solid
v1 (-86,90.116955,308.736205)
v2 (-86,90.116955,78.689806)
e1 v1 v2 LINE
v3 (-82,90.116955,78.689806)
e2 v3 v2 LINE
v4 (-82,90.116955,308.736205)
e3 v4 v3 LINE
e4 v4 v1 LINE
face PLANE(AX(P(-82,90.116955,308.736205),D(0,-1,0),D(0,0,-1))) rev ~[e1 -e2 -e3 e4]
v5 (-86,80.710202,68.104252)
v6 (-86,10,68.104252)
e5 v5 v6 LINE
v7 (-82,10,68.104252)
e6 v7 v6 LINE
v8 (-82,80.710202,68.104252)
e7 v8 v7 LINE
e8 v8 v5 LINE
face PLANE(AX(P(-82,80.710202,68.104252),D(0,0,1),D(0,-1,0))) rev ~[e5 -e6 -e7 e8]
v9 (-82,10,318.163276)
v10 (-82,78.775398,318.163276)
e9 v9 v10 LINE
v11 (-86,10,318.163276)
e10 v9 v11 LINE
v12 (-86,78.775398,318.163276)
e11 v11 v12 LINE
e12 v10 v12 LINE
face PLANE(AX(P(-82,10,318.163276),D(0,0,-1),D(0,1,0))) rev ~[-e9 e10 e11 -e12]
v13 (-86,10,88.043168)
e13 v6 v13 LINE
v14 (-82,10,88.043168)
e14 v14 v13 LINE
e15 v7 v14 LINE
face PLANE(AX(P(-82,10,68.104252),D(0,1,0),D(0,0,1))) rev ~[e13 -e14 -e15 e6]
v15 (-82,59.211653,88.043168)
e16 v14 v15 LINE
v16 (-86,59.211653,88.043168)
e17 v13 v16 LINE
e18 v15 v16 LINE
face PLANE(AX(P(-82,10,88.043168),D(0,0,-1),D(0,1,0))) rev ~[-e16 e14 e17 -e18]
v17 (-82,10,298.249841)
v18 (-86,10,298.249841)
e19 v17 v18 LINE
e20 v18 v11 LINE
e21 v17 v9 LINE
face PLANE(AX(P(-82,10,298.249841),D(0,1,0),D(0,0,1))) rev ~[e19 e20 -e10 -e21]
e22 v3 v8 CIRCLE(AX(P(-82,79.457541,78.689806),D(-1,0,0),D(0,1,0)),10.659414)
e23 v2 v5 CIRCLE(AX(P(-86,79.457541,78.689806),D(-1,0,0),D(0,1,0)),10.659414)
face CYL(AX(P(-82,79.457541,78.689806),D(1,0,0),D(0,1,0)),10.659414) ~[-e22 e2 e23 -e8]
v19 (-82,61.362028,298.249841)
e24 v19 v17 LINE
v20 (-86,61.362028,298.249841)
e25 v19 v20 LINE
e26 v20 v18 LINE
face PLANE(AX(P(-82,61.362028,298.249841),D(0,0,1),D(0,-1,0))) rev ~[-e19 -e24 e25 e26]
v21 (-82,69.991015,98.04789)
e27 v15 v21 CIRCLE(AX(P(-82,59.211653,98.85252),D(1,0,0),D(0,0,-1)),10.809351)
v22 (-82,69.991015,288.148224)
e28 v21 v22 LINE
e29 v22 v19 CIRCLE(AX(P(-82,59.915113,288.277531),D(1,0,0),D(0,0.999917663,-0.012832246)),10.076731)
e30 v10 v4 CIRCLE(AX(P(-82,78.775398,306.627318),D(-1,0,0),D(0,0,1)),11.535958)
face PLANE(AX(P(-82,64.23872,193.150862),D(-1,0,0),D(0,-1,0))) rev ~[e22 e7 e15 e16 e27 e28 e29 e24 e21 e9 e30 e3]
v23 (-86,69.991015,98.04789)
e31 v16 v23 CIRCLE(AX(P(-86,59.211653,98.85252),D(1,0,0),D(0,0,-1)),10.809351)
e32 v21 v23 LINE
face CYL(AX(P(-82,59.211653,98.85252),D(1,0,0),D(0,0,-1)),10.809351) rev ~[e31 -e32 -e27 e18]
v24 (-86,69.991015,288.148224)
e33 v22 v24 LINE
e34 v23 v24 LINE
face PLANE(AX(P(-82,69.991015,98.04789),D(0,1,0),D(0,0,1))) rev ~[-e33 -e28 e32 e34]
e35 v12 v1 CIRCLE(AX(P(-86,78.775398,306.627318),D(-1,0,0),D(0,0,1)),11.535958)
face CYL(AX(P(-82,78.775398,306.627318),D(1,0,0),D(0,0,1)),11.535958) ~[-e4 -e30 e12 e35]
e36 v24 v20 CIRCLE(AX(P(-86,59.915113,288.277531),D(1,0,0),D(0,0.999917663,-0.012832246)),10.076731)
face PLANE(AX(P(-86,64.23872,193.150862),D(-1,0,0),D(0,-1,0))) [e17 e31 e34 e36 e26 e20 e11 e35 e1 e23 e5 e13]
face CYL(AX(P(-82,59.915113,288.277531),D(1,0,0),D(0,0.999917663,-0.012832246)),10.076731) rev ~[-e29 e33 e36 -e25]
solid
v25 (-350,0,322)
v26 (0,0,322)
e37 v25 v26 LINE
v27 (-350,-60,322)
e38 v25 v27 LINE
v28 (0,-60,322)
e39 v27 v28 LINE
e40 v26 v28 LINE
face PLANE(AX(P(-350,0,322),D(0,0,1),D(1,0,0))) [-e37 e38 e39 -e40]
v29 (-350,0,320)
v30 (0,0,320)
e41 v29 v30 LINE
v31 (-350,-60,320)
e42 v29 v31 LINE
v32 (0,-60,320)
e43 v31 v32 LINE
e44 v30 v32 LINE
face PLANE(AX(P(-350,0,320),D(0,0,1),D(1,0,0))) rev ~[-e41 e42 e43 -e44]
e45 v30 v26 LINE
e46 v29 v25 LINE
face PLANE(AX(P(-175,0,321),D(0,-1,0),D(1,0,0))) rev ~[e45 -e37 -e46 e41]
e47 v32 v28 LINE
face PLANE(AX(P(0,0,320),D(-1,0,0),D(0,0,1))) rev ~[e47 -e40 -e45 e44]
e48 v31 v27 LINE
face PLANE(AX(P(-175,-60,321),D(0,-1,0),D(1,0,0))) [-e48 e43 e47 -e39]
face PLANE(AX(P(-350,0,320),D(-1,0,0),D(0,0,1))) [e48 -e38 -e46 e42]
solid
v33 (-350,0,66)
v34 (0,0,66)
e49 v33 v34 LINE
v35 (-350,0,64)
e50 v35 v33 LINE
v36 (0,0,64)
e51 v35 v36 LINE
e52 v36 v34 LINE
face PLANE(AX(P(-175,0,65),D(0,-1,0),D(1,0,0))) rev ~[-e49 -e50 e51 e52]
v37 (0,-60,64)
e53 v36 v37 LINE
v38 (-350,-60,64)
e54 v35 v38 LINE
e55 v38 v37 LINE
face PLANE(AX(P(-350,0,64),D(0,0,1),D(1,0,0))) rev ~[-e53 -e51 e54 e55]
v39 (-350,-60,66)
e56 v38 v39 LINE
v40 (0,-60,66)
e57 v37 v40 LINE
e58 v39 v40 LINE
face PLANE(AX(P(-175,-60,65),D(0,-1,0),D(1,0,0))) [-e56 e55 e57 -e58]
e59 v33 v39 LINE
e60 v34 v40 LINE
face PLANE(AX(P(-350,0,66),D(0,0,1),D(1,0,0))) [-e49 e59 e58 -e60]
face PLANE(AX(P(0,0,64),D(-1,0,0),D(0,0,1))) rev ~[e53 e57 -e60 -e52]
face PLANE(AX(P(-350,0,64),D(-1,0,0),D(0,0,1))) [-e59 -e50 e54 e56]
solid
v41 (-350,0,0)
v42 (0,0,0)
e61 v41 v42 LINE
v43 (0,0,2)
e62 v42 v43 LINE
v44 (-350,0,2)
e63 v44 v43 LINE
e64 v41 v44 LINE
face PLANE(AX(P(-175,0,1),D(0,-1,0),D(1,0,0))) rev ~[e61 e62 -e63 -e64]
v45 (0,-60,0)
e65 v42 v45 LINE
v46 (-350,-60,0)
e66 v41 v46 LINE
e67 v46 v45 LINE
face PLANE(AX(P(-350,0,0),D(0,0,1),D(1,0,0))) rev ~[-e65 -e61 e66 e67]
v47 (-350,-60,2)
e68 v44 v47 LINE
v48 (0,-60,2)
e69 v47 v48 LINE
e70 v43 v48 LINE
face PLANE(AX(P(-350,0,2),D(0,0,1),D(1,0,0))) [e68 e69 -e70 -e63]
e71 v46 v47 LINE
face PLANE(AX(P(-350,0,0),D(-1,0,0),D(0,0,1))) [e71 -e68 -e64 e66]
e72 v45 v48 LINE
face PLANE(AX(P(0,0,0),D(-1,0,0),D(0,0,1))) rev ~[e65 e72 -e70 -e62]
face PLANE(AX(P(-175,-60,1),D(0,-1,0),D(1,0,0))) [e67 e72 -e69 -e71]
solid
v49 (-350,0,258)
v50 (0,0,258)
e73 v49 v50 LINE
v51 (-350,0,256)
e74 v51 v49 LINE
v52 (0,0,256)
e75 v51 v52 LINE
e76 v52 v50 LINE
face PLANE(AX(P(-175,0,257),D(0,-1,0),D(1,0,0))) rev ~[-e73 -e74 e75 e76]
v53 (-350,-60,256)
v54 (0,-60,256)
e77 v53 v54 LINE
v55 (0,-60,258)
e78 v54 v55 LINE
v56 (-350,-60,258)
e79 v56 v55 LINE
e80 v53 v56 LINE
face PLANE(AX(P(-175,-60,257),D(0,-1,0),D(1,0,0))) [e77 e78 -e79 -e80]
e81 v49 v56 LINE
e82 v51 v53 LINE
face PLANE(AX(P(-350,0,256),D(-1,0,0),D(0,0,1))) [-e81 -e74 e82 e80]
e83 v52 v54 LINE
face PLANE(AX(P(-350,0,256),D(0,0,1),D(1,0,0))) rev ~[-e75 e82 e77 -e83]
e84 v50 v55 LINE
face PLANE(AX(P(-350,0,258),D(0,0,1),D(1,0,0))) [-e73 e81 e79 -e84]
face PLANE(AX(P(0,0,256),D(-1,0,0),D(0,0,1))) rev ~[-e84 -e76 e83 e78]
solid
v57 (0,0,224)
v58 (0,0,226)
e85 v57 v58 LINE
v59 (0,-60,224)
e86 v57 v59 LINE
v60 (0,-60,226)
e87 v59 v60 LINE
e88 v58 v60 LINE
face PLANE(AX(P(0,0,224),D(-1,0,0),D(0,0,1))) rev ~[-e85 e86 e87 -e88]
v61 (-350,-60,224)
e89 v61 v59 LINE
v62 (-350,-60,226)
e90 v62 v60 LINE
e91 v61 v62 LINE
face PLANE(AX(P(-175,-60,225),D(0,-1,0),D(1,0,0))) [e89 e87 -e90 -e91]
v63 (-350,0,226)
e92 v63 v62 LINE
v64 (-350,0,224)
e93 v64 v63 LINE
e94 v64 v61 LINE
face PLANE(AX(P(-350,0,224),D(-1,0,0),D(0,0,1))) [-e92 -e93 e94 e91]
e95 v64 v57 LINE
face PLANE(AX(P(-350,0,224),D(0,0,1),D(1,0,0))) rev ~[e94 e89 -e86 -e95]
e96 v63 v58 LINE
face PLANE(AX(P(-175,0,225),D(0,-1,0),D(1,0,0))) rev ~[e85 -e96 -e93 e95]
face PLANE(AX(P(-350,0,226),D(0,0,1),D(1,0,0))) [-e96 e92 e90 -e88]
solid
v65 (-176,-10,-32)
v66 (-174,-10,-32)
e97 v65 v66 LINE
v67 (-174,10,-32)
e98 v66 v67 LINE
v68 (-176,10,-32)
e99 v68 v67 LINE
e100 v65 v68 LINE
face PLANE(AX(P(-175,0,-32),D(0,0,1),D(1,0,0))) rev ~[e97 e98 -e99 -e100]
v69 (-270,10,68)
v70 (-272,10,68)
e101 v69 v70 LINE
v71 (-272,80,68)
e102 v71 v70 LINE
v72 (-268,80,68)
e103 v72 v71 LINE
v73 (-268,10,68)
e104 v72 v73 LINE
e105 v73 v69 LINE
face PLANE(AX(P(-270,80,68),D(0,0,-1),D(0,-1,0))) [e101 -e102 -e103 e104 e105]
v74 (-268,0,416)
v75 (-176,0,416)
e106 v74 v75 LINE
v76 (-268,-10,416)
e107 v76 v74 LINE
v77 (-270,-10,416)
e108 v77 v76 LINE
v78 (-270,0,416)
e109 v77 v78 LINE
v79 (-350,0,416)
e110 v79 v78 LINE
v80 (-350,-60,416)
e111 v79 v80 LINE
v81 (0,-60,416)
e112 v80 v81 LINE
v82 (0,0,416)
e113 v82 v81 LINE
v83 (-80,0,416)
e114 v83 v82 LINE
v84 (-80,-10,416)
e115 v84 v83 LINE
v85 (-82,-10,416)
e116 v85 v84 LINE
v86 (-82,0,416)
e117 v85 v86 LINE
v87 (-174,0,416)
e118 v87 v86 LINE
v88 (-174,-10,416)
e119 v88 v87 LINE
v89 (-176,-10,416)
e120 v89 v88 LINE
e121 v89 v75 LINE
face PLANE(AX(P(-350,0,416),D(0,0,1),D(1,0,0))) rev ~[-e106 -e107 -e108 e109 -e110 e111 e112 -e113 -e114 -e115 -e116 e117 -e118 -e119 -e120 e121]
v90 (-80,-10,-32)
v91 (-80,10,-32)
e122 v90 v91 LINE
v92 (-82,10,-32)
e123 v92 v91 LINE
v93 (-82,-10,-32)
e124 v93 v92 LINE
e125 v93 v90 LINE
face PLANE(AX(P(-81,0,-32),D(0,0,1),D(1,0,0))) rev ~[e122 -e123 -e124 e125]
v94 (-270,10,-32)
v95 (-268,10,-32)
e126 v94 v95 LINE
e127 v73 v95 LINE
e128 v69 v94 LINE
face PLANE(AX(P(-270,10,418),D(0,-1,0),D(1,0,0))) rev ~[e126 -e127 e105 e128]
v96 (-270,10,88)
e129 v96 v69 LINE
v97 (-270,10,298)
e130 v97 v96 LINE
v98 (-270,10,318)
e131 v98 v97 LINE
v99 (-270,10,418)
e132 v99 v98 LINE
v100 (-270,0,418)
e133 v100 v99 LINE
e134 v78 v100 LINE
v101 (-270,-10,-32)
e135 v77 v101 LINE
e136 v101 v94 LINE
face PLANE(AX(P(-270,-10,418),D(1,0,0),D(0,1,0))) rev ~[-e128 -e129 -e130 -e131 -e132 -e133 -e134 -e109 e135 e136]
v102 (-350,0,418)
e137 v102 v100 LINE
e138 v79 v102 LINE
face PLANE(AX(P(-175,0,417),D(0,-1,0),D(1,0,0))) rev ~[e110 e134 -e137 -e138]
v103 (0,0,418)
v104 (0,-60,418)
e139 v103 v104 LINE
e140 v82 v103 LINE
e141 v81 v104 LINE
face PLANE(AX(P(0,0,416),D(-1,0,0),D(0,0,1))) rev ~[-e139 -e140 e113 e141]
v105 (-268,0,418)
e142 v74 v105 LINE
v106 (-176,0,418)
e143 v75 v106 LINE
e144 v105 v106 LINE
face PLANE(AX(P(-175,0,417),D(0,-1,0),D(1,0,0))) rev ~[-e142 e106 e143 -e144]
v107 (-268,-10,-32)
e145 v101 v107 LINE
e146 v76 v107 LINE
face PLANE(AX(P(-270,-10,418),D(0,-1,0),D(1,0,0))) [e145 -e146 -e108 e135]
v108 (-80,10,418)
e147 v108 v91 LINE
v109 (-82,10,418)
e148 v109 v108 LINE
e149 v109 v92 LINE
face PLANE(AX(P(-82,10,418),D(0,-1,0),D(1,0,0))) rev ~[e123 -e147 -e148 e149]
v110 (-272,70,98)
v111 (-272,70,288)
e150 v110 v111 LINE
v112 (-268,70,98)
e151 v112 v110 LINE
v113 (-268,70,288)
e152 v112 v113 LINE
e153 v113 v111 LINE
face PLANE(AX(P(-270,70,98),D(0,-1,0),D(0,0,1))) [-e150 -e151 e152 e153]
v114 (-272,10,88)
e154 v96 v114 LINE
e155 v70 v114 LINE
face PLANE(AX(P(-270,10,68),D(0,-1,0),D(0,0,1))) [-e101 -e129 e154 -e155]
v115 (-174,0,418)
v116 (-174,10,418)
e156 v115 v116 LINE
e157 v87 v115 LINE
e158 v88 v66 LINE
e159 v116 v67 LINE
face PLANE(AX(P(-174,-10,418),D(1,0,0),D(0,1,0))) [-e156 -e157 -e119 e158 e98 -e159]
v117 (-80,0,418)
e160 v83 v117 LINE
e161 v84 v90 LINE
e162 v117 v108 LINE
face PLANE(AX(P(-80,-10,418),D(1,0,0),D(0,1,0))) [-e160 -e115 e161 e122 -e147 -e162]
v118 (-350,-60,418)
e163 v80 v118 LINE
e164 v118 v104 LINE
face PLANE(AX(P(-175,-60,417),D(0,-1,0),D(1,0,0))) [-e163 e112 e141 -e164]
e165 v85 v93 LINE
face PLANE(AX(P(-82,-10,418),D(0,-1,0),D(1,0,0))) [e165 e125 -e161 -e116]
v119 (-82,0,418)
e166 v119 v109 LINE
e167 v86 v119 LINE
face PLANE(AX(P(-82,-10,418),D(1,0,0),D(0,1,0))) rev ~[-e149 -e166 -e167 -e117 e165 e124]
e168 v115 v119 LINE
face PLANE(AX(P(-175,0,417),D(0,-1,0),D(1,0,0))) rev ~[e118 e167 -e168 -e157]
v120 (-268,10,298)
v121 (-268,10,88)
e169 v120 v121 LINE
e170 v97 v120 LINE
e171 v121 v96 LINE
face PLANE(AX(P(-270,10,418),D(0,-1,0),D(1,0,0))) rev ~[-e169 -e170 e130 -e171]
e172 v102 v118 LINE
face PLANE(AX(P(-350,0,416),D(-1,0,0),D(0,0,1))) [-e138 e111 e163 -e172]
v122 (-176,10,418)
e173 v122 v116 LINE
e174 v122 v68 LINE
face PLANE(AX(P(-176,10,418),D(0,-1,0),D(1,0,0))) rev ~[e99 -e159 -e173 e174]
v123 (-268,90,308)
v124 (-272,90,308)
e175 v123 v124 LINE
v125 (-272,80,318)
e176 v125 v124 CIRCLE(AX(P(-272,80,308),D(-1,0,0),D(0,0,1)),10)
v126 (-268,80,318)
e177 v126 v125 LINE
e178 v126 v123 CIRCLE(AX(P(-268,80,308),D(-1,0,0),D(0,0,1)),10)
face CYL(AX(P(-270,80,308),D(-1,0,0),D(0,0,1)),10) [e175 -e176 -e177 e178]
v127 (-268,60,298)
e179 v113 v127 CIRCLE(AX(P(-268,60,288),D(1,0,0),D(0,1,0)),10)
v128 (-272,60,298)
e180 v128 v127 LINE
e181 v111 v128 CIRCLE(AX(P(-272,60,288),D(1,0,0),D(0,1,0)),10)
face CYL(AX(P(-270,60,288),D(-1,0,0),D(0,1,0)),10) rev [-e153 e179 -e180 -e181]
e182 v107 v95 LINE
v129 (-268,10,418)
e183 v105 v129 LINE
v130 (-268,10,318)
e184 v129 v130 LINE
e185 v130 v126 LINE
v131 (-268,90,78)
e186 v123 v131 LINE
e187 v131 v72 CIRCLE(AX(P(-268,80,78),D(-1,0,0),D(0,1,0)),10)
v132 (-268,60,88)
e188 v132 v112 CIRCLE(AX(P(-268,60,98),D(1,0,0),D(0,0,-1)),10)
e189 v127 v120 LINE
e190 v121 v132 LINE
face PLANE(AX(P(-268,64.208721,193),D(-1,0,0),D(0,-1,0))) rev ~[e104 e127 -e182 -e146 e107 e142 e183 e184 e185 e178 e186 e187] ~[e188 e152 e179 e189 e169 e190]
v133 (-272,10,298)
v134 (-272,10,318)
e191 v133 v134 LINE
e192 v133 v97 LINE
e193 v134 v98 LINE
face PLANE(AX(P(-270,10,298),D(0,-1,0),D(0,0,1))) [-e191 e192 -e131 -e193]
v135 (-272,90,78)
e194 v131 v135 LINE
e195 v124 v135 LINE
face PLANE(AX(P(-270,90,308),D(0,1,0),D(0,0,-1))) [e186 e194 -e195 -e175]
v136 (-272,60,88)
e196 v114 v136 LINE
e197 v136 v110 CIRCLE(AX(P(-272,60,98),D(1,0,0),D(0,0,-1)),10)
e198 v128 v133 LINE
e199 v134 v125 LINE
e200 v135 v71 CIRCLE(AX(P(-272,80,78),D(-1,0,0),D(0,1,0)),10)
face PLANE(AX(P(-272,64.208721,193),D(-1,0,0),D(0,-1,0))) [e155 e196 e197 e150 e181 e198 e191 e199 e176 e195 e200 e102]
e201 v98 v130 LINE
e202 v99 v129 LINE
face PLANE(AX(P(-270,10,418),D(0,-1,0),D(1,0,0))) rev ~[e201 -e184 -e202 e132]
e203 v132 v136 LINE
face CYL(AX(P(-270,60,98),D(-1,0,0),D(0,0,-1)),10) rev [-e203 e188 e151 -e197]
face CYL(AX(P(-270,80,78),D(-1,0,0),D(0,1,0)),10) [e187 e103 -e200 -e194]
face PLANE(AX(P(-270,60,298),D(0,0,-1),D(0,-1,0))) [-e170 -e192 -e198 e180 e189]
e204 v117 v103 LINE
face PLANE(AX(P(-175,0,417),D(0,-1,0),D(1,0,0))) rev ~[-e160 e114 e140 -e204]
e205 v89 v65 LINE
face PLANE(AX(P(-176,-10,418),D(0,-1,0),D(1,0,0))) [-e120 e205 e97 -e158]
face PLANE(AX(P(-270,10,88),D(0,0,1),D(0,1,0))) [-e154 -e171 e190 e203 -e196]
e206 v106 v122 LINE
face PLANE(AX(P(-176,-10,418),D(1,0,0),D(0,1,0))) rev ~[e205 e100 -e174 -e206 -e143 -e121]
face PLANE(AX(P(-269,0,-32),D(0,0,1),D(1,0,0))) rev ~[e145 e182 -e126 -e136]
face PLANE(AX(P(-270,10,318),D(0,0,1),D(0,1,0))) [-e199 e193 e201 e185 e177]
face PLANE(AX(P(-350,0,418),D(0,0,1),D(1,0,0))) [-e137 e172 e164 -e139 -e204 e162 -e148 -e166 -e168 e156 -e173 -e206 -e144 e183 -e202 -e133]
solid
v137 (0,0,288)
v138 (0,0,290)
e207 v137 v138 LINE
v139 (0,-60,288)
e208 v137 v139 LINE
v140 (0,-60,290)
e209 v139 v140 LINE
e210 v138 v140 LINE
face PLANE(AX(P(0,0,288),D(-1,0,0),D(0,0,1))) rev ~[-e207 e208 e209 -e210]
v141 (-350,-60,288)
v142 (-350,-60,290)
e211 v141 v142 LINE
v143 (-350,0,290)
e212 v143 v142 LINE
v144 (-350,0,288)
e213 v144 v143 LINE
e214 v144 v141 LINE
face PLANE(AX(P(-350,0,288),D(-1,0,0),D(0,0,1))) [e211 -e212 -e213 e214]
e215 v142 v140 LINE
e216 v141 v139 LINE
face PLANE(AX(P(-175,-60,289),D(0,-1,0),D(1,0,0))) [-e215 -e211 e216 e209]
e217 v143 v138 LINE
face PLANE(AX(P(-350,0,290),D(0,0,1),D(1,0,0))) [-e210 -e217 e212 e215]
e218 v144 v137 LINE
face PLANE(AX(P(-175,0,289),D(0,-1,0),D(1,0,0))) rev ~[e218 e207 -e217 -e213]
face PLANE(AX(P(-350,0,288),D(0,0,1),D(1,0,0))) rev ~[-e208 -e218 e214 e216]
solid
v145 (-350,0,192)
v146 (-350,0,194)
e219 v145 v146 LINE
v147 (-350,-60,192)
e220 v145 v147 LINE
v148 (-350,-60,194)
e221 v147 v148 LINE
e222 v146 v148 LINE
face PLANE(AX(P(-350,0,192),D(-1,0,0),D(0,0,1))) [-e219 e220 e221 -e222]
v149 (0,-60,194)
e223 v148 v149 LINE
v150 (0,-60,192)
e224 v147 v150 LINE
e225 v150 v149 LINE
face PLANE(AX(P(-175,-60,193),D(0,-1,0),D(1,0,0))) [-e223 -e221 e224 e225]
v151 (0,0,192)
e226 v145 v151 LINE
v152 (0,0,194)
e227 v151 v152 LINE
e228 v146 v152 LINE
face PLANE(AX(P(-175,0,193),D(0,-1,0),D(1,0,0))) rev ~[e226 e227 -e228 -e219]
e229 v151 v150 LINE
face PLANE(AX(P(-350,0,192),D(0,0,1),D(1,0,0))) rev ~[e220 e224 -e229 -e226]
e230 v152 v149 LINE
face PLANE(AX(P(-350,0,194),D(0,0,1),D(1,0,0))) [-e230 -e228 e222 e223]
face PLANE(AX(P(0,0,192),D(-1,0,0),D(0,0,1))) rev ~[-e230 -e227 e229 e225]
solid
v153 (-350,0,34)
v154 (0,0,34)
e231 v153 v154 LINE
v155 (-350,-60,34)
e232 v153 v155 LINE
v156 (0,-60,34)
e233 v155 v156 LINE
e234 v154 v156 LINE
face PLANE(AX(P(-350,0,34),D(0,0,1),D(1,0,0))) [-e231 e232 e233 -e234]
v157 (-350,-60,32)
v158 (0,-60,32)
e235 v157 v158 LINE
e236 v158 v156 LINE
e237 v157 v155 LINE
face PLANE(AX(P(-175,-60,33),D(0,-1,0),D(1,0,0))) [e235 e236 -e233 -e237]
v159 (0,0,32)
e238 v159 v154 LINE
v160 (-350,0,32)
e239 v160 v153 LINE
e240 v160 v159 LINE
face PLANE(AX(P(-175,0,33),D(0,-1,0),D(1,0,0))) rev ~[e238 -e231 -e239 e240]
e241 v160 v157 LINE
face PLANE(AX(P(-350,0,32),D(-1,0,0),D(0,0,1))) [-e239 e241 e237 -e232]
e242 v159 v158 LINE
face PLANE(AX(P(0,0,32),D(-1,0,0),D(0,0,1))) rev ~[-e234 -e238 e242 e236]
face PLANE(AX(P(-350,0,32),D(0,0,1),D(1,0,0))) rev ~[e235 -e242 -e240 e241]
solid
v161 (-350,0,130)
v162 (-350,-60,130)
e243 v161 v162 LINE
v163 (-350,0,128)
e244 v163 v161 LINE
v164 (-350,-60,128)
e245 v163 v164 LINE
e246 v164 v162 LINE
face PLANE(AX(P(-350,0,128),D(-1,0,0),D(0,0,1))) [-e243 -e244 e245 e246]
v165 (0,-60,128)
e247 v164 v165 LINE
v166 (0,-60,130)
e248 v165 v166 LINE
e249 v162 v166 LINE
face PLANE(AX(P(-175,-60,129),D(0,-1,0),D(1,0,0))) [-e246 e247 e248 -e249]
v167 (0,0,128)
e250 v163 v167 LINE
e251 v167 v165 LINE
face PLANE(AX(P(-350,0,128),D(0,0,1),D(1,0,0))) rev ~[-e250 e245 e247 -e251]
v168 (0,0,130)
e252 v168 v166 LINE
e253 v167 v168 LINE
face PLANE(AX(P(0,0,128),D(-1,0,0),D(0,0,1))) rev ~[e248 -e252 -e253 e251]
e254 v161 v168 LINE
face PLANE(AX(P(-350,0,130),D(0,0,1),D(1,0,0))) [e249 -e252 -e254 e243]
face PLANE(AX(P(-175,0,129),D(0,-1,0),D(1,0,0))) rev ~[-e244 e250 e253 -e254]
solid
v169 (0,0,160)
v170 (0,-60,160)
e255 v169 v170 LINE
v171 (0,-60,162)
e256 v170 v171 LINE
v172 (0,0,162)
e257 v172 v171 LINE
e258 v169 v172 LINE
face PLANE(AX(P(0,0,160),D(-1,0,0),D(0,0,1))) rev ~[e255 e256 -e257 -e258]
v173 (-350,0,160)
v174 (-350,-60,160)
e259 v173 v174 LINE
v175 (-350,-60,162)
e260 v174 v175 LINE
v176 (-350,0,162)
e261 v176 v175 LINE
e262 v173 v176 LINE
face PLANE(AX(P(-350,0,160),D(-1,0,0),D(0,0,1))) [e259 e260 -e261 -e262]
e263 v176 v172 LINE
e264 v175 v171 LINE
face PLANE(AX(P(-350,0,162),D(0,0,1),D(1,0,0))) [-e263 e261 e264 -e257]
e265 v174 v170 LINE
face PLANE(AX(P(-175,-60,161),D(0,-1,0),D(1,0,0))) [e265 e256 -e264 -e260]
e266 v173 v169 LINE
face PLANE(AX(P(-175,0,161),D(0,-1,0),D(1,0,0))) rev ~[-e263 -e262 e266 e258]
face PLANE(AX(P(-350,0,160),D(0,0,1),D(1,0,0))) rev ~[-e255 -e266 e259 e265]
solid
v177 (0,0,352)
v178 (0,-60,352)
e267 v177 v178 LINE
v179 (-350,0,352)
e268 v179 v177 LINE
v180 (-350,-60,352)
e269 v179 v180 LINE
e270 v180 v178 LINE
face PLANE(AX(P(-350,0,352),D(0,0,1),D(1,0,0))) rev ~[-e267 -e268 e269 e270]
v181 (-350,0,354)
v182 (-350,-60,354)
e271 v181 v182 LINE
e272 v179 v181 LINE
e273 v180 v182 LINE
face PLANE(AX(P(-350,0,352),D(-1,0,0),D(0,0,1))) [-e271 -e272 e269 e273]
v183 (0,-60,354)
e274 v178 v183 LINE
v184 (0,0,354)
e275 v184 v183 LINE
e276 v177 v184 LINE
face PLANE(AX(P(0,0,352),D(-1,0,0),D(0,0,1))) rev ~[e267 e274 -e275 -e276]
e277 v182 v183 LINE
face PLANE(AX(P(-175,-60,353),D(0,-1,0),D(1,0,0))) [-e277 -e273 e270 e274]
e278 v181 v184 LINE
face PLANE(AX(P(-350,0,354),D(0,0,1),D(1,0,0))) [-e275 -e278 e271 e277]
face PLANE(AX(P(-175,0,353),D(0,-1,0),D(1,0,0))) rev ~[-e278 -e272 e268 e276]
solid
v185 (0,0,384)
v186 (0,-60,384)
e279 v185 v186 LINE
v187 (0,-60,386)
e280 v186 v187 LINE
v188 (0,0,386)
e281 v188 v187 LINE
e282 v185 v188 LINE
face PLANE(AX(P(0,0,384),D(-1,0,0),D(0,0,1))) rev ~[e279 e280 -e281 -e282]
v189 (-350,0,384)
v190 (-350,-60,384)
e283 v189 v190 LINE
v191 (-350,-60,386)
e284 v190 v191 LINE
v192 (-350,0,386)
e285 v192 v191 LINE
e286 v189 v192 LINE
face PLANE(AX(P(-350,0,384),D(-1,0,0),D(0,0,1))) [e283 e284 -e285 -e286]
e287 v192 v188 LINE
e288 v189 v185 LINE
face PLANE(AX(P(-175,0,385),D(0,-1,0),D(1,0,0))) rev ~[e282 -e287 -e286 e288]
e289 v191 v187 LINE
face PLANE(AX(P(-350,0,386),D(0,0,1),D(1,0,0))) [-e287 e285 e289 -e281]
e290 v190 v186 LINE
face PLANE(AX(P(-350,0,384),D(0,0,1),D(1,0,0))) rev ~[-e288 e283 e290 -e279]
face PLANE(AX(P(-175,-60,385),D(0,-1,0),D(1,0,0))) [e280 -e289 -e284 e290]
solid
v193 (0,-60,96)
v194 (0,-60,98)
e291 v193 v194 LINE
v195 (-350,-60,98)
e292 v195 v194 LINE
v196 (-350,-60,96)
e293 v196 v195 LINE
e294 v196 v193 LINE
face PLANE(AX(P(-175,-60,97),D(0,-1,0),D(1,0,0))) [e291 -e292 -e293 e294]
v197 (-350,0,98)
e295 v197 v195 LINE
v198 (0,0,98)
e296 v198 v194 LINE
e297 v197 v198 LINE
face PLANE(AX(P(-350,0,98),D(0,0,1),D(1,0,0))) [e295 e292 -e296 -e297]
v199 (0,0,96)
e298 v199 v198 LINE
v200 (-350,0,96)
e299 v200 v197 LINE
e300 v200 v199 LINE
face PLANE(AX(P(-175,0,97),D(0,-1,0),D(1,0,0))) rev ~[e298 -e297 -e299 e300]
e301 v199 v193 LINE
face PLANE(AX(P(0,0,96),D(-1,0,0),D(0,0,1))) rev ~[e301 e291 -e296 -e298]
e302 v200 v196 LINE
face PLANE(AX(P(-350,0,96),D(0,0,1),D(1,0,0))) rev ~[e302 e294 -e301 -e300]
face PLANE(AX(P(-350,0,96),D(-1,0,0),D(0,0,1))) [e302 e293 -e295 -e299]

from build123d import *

# Parameters (mm, degrees)
F0_W     = 350
F0_H     = 2
F1_DEPTH = 60
F2_W     = 2
F2_H     = 20
F3_DEPTH = 450
F6_DEPTH = 2
F8_DEPTH = 4


with BuildPart() as f1:
    # F0 (on Front) → F1 (new body)
    with BuildSketch(Plane.XZ):
        with Locations((-175, 417)):
            Rectangle(F0_W, F0_H)
    extrude(amount=F1_DEPTH)

    # F2 (on face) → F3 (join)
    with BuildSketch(Plane.XY.offset(418)):
        with Locations((-269, 0)):
            Rectangle(F2_W, F2_H)
        with Locations((-81, 0)):
            Rectangle(F2_W, F2_H)
        with Locations((-175, 0)):
            Rectangle(F2_W, F2_H)
    extrude(amount=-F3_DEPTH)

    # F5 (on face) → F6 (join, symmetric)
    with BuildSketch(Plane(origin=(-270, 0, 0), x_dir=(0, -1, 0), z_dir=(-1, 0, 0))):
        with BuildLine():
            Line((-10, 318), (-70, 318))
            Line((-70, 318), (-80, 318))
            ThreePointArc((-80, 318), (-87.0710678119, 315.0710678119), (-90, 308))
            Line((-90, 308), (-90, 78))
            ThreePointArc((-90, 78), (-87.0710678119, 70.9289321881), (-80, 68))
            Line((-80, 68), (-70, 68))
            Line((-70, 68), (-10, 68))
            Line((-10, 68), (-10, 88))
            Line((-10, 88), (-60, 88))
            ThreePointArc((-60, 88), (-67.0710678119, 90.9289321881), (-70, 98))
            Line((-70, 98), (-70, 288))
            ThreePointArc((-70, 288), (-67.0710678119, 295.0710678119), (-60, 298))
            Line((-60, 298), (-10, 298))
            Line((-10, 298), (-10, 318))
        make_face()
    extrude(amount=F6_DEPTH, both=True)


with BuildPart() as f1b:
    # F0 (on Front) → F1, piece 2 (new body)
    with BuildSketch(Plane.XZ):
        with Locations((-175, 385)):
            Rectangle(F0_W, F0_H)
    extrude(amount=F1_DEPTH)


with BuildPart() as f1c:
    # F0 (on Front) → F1, piece 3 (new body)
    with BuildSketch(Plane.XZ):
        with Locations((-175, 353)):
            Rectangle(F0_W, F0_H)
    extrude(amount=F1_DEPTH)


with BuildPart() as f1d:
    # F0 (on Front) → F1, piece 4 (new body)
    with BuildSketch(Plane.XZ):
        with Locations((-175, 321)):
            Rectangle(F0_W, F0_H)
    extrude(amount=F1_DEPTH)


with BuildPart() as f1e:
    # F0 (on Front) → F1, piece 5 (new body)
    with BuildSketch(Plane.XZ):
        with Locations((-175, 289)):
            Rectangle(F0_W, F0_H)
    extrude(amount=F1_DEPTH)


with BuildPart() as f1f:
    # F0 (on Front) → F1, piece 6 (new body)
    with BuildSketch(Plane.XZ):
        with Locations((-175, 257)):
            Rectangle(F0_W, F0_H)
    extrude(amount=F1_DEPTH)


with BuildPart() as f1g:
    # F0 (on Front) → F1, piece 7 (new body)
    with BuildSketch(Plane.XZ):
        with Locations((-175, 225)):
            Rectangle(F0_W, F0_H)
    extrude(amount=F1_DEPTH)


with BuildPart() as f1h:
    # F0 (on Front) → F1, piece 8 (new body)
    with BuildSketch(Plane.XZ):
        with Locations((-175, 193)):
            Rectangle(F0_W, F0_H)
    extrude(amount=F1_DEPTH)


with BuildPart() as f1i:
    # F0 (on Front) → F1, piece 9 (new body)
    with BuildSketch(Plane.XZ):
        with Locations((-175, 161)):
            Rectangle(F0_W, F0_H)
    extrude(amount=F1_DEPTH)


with BuildPart() as f1j:
    # F0 (on Front) → F1, piece 10 (new body)
    with BuildSketch(Plane.XZ):
        with Locations((-175, 129)):
            Rectangle(F0_W, F0_H)
    extrude(amount=F1_DEPTH)


with BuildPart() as f1k:
    # F0 (on Front) → F1, piece 11 (new body)
    with BuildSketch(Plane.XZ):
        with Locations((-175, 97)):
            Rectangle(F0_W, F0_H)
    extrude(amount=F1_DEPTH)


with BuildPart() as f1l:
    # F0 (on Front) → F1, piece 12 (new body)
    with BuildSketch(Plane.XZ):
        with Locations((-175, 65)):
            Rectangle(F0_W, F0_H)
    extrude(amount=F1_DEPTH)


with BuildPart() as f1m:
    # F0 (on Front) → F1, piece 13 (new body)
    with BuildSketch(Plane.XZ):
        with Locations((-175, 33)):
            Rectangle(F0_W, F0_H)
    extrude(amount=F1_DEPTH)


with BuildPart() as f1n:
    # F0 (on Front) → F1, piece 14 (new body)
    with BuildSketch(Plane.XZ):
        with Locations((-175, 1)):
            Rectangle(F0_W, F0_H)
    extrude(amount=F1_DEPTH)


with BuildPart() as f8:
    # F7 (on face) → F8 (new body)
    with BuildSketch(Plane(origin=(-82, 0, 0), x_dir=(0, -1, 0), z_dir=(-1, 0, 0))):
        with BuildLine():
            Line((-10, 298.2498407364), (-10, 318.1632757187))
            Line((-10, 318.1632757187), (-78.7753984332, 318.1632757187))
            ThreePointArc((-78.7753984332, 318.1632757187), (-86.1493487568, 315.4987990699), (-90.1169553399, 308.736205101))
            Line((-90.1169553399, 308.736205101), (-90.1169553399, 78.6898061633))
            ThreePointArc((-90.1169553399, 78.6898061633), (-87.4254689451, 71.609182036), (-80.7102024555, 68.1042522192))
            Line((-80.7102024555, 68.1042522192), (-10, 68.1042522192))
            Line((-10, 68.1042522192), (-10, 88.0431681871))
            Line((-10, 88.0431681871), (-59.2116527259, 88.0431681871))
            ThreePointArc((-59.2116527259, 88.0431681871), (-66.5650380478, 90.9297800306), (-69.9910148978, 98.0478897691))
            Line((-69.9910148978, 98.0478897691), (-69.9910148978, 288.1482243538))
            ThreePointArc((-69.9910148978, 288.1482243538), (-67.5769986798, 294.8224551486), (-61.3620281219, 298.2498407364))
            Line((-61.3620281219, 298.2498407364), (-10, 298.2498407364))
        make_face()
    extrude(amount=F8_DEPTH)


solid = Compound([f1.part, f1b.part, f1c.part, f1d.part, f1e.part, f1f.part, f1g.part, f1h.part, f1i.part, f1j.part, f1k.part, f1l.part, f1m.part, f1n.part, f8.part])
